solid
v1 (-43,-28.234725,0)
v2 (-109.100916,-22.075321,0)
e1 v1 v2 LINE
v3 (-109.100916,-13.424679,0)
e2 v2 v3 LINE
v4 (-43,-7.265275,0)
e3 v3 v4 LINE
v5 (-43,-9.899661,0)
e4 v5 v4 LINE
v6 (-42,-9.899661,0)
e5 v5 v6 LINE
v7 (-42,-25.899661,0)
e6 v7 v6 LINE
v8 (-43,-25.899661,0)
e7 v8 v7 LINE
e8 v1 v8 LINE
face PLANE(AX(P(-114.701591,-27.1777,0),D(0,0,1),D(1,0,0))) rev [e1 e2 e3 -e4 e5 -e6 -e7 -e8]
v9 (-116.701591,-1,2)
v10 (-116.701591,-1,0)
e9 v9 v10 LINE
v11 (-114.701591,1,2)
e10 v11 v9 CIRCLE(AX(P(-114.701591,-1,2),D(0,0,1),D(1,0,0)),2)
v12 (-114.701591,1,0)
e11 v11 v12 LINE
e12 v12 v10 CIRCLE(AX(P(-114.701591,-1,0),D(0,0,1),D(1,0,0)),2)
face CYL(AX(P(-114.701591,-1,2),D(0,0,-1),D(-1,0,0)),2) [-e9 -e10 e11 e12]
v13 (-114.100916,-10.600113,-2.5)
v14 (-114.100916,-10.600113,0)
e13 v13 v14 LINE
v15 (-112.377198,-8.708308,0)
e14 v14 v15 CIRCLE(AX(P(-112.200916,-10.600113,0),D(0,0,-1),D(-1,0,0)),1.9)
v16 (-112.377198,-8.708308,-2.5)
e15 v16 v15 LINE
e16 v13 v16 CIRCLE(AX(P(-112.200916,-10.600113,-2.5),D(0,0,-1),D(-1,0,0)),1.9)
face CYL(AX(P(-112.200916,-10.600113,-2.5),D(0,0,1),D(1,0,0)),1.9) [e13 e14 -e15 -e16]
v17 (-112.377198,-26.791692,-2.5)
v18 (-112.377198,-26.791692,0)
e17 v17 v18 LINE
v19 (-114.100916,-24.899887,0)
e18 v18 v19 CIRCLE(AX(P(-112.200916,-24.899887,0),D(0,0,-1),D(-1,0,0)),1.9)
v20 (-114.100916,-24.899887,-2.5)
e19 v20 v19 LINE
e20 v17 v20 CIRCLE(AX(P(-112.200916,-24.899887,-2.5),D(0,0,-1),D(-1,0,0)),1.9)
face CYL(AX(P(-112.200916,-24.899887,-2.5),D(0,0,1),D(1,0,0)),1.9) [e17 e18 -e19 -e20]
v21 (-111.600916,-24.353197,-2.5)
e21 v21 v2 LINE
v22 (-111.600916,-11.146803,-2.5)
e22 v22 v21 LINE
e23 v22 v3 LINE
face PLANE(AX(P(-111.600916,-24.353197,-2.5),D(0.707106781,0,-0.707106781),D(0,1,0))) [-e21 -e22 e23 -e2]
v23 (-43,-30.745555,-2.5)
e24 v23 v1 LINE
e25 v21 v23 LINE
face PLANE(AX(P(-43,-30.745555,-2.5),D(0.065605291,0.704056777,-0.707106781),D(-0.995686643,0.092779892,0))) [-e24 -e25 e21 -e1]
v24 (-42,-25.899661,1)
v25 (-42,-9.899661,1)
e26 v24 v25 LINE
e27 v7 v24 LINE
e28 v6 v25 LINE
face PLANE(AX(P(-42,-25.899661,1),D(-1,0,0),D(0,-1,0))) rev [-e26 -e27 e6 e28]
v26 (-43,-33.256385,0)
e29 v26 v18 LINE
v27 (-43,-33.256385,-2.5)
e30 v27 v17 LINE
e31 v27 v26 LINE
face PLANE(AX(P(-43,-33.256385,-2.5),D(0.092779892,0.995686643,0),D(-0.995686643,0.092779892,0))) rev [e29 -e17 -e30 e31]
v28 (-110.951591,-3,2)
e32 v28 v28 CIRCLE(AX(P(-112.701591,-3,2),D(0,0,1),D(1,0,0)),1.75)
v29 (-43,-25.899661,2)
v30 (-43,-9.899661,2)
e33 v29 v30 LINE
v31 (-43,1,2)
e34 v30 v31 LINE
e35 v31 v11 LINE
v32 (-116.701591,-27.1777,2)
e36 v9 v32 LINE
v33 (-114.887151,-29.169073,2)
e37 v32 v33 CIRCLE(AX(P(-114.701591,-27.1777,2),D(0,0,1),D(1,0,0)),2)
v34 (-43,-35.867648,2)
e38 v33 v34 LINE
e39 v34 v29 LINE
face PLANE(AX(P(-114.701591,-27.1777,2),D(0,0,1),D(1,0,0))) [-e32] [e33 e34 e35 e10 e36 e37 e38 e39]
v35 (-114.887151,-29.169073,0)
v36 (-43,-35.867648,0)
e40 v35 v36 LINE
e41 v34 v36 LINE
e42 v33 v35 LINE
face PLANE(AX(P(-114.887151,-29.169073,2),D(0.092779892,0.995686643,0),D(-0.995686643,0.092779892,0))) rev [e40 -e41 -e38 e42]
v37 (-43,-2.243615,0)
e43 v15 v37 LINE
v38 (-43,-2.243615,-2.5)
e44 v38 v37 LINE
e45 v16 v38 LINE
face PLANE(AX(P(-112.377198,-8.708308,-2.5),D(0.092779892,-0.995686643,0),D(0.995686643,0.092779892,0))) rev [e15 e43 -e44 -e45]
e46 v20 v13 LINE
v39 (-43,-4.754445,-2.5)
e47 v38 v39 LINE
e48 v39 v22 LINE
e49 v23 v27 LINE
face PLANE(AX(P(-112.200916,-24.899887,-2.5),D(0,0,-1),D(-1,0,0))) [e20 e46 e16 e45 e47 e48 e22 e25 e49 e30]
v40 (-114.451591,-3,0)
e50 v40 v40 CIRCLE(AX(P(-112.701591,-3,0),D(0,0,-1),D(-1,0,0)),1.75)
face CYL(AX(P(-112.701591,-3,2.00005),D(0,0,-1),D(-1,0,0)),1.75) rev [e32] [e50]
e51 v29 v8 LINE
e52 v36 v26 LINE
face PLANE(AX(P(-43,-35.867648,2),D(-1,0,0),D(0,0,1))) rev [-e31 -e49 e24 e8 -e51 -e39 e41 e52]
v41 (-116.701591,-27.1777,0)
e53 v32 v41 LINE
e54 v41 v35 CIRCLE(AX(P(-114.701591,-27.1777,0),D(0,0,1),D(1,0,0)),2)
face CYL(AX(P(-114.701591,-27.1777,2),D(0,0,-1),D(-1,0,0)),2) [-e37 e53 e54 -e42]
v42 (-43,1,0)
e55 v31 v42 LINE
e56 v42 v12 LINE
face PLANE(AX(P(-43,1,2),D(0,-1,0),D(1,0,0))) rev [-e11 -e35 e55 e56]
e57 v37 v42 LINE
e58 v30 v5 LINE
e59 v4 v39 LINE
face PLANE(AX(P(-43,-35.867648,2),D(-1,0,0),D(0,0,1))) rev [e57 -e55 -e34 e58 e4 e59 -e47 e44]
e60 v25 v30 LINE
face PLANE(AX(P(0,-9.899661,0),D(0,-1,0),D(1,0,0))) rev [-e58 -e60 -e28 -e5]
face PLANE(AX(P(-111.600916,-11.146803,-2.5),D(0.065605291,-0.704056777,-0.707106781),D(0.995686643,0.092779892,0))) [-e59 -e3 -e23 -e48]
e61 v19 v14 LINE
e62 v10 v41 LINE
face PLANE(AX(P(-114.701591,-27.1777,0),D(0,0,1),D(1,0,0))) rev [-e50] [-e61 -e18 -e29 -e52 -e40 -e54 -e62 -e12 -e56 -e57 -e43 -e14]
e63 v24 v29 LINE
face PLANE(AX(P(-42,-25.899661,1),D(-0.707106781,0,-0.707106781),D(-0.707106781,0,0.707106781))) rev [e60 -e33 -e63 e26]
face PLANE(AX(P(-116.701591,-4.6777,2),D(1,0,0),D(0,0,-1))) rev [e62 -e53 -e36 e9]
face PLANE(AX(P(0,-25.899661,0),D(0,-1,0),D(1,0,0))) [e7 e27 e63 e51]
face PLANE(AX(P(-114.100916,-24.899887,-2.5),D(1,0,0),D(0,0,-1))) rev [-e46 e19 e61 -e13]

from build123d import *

# Parameters (mm, degrees)
BOSS_EXTRUDE1_DEPTH = 2
BOSS_EXTRUDE2_DEPTH = 8
BOSS_EXTRUDE3_DEPTH = 2.5
CHAMFER1_SIZE       = 2.5
SKETCH5_R           = 1.75
CUT_EXTRUDE1_DEPTH  = 123.114698641


with BuildPart() as part:
    # Sketch1 → Boss-Extrude1 (new body)
    with BuildSketch(Plane.XY):
        with BuildLine():
            Line((-43, -35.867648288), (-43, 1))
            Line((-43, 1), (-114.701591379, 1))
            ThreePointArc((-114.701591379, 1), (-116.115804942, 0.414213562), (-116.701591379, -1))
            Line((-116.701591379, -1), (-116.701591379, -4.677699552))
            Line((-116.701591379, -4.677699552), (-116.701591379, -27.177699552))
            ThreePointArc((-116.701591379, -27.177699552), (-116.179955267, -28.524711139), (-114.887151163, -29.169072838))
            Line((-114.887151163, -29.169072838), (-43, -35.867648288))
        make_face()
    extrude(amount=BOSS_EXTRUDE1_DEPTH)

    # Sketch3 → Boss-Extrude2 (add, symmetric)
    with BuildSketch(Plane(origin=(0, -17.899660586, 0), x_dir=(-1, 0, 0), z_dir=(0, -1, 0))):
        Polygon((42, -1), (42, 0), (43, 0), (43, -2), align=None)
    extrude(amount=BOSS_EXTRUDE2_DEPTH, both=True)

    # Sketch4 → Boss-Extrude3 (add)
    with BuildSketch(Plane(origin=(0, 0, 0), x_dir=(-1, 0, 0), z_dir=(0, 0, -1))):
        with BuildLine():
            Line((114.100916052, -24.89988692), (114.100916052, -10.60011308))
            ThreePointArc((114.100916052, -10.60011308), (113.605361745, -9.320452072), (112.377197846, -8.708308458))
            Line((112.377197846, -8.708308458), (43, -2.243615022))
            Line((43, -2.243615022), (43, -4.754445128))
            Line((43, -4.754445128), (111.600916052, -11.146803215))
            Line((111.600916052, -11.146803215), (111.600916052, -24.353196785))
            Line((111.600916052, -24.353196785), (43, -30.745554872))
            Line((43, -30.745554872), (43, -33.256384978))
            Line((43, -33.256384978), (112.377197846, -26.791691542))
            ThreePointArc((112.377197846, -26.791691542), (113.605361745, -26.179547928), (114.100916052, -24.89988692))
        make_face()
    extrude(amount=BOSS_EXTRUDE3_DEPTH)

    # Chamfer1
    chamfer1_edges = [part.edges().sort_by_distance(p)[0] for p in [
        (-77.300458026, -27.549375828, 0),
        (-111.600916052, -17.75, 0),
        (-77.300458026, -7.950624172, 0),
    ]]
    chamfer(chamfer1_edges, length=CHAMFER1_SIZE - 0.0001)  # a hair under: the kernel refuses the full size

    # Sketch5 → Cut-Extrude1 (cut, through all)
    with BuildSketch(Plane(origin=(0, 0, 0), x_dir=(-1, 0, 0), z_dir=(0, 0, -1))):
        with Locations((112.701591379, -3)):
            Circle(SKETCH5_R)
    extrude(amount=-CUT_EXTRUDE1_DEPTH, mode=Mode.SUBTRACT)


solid = part.part
